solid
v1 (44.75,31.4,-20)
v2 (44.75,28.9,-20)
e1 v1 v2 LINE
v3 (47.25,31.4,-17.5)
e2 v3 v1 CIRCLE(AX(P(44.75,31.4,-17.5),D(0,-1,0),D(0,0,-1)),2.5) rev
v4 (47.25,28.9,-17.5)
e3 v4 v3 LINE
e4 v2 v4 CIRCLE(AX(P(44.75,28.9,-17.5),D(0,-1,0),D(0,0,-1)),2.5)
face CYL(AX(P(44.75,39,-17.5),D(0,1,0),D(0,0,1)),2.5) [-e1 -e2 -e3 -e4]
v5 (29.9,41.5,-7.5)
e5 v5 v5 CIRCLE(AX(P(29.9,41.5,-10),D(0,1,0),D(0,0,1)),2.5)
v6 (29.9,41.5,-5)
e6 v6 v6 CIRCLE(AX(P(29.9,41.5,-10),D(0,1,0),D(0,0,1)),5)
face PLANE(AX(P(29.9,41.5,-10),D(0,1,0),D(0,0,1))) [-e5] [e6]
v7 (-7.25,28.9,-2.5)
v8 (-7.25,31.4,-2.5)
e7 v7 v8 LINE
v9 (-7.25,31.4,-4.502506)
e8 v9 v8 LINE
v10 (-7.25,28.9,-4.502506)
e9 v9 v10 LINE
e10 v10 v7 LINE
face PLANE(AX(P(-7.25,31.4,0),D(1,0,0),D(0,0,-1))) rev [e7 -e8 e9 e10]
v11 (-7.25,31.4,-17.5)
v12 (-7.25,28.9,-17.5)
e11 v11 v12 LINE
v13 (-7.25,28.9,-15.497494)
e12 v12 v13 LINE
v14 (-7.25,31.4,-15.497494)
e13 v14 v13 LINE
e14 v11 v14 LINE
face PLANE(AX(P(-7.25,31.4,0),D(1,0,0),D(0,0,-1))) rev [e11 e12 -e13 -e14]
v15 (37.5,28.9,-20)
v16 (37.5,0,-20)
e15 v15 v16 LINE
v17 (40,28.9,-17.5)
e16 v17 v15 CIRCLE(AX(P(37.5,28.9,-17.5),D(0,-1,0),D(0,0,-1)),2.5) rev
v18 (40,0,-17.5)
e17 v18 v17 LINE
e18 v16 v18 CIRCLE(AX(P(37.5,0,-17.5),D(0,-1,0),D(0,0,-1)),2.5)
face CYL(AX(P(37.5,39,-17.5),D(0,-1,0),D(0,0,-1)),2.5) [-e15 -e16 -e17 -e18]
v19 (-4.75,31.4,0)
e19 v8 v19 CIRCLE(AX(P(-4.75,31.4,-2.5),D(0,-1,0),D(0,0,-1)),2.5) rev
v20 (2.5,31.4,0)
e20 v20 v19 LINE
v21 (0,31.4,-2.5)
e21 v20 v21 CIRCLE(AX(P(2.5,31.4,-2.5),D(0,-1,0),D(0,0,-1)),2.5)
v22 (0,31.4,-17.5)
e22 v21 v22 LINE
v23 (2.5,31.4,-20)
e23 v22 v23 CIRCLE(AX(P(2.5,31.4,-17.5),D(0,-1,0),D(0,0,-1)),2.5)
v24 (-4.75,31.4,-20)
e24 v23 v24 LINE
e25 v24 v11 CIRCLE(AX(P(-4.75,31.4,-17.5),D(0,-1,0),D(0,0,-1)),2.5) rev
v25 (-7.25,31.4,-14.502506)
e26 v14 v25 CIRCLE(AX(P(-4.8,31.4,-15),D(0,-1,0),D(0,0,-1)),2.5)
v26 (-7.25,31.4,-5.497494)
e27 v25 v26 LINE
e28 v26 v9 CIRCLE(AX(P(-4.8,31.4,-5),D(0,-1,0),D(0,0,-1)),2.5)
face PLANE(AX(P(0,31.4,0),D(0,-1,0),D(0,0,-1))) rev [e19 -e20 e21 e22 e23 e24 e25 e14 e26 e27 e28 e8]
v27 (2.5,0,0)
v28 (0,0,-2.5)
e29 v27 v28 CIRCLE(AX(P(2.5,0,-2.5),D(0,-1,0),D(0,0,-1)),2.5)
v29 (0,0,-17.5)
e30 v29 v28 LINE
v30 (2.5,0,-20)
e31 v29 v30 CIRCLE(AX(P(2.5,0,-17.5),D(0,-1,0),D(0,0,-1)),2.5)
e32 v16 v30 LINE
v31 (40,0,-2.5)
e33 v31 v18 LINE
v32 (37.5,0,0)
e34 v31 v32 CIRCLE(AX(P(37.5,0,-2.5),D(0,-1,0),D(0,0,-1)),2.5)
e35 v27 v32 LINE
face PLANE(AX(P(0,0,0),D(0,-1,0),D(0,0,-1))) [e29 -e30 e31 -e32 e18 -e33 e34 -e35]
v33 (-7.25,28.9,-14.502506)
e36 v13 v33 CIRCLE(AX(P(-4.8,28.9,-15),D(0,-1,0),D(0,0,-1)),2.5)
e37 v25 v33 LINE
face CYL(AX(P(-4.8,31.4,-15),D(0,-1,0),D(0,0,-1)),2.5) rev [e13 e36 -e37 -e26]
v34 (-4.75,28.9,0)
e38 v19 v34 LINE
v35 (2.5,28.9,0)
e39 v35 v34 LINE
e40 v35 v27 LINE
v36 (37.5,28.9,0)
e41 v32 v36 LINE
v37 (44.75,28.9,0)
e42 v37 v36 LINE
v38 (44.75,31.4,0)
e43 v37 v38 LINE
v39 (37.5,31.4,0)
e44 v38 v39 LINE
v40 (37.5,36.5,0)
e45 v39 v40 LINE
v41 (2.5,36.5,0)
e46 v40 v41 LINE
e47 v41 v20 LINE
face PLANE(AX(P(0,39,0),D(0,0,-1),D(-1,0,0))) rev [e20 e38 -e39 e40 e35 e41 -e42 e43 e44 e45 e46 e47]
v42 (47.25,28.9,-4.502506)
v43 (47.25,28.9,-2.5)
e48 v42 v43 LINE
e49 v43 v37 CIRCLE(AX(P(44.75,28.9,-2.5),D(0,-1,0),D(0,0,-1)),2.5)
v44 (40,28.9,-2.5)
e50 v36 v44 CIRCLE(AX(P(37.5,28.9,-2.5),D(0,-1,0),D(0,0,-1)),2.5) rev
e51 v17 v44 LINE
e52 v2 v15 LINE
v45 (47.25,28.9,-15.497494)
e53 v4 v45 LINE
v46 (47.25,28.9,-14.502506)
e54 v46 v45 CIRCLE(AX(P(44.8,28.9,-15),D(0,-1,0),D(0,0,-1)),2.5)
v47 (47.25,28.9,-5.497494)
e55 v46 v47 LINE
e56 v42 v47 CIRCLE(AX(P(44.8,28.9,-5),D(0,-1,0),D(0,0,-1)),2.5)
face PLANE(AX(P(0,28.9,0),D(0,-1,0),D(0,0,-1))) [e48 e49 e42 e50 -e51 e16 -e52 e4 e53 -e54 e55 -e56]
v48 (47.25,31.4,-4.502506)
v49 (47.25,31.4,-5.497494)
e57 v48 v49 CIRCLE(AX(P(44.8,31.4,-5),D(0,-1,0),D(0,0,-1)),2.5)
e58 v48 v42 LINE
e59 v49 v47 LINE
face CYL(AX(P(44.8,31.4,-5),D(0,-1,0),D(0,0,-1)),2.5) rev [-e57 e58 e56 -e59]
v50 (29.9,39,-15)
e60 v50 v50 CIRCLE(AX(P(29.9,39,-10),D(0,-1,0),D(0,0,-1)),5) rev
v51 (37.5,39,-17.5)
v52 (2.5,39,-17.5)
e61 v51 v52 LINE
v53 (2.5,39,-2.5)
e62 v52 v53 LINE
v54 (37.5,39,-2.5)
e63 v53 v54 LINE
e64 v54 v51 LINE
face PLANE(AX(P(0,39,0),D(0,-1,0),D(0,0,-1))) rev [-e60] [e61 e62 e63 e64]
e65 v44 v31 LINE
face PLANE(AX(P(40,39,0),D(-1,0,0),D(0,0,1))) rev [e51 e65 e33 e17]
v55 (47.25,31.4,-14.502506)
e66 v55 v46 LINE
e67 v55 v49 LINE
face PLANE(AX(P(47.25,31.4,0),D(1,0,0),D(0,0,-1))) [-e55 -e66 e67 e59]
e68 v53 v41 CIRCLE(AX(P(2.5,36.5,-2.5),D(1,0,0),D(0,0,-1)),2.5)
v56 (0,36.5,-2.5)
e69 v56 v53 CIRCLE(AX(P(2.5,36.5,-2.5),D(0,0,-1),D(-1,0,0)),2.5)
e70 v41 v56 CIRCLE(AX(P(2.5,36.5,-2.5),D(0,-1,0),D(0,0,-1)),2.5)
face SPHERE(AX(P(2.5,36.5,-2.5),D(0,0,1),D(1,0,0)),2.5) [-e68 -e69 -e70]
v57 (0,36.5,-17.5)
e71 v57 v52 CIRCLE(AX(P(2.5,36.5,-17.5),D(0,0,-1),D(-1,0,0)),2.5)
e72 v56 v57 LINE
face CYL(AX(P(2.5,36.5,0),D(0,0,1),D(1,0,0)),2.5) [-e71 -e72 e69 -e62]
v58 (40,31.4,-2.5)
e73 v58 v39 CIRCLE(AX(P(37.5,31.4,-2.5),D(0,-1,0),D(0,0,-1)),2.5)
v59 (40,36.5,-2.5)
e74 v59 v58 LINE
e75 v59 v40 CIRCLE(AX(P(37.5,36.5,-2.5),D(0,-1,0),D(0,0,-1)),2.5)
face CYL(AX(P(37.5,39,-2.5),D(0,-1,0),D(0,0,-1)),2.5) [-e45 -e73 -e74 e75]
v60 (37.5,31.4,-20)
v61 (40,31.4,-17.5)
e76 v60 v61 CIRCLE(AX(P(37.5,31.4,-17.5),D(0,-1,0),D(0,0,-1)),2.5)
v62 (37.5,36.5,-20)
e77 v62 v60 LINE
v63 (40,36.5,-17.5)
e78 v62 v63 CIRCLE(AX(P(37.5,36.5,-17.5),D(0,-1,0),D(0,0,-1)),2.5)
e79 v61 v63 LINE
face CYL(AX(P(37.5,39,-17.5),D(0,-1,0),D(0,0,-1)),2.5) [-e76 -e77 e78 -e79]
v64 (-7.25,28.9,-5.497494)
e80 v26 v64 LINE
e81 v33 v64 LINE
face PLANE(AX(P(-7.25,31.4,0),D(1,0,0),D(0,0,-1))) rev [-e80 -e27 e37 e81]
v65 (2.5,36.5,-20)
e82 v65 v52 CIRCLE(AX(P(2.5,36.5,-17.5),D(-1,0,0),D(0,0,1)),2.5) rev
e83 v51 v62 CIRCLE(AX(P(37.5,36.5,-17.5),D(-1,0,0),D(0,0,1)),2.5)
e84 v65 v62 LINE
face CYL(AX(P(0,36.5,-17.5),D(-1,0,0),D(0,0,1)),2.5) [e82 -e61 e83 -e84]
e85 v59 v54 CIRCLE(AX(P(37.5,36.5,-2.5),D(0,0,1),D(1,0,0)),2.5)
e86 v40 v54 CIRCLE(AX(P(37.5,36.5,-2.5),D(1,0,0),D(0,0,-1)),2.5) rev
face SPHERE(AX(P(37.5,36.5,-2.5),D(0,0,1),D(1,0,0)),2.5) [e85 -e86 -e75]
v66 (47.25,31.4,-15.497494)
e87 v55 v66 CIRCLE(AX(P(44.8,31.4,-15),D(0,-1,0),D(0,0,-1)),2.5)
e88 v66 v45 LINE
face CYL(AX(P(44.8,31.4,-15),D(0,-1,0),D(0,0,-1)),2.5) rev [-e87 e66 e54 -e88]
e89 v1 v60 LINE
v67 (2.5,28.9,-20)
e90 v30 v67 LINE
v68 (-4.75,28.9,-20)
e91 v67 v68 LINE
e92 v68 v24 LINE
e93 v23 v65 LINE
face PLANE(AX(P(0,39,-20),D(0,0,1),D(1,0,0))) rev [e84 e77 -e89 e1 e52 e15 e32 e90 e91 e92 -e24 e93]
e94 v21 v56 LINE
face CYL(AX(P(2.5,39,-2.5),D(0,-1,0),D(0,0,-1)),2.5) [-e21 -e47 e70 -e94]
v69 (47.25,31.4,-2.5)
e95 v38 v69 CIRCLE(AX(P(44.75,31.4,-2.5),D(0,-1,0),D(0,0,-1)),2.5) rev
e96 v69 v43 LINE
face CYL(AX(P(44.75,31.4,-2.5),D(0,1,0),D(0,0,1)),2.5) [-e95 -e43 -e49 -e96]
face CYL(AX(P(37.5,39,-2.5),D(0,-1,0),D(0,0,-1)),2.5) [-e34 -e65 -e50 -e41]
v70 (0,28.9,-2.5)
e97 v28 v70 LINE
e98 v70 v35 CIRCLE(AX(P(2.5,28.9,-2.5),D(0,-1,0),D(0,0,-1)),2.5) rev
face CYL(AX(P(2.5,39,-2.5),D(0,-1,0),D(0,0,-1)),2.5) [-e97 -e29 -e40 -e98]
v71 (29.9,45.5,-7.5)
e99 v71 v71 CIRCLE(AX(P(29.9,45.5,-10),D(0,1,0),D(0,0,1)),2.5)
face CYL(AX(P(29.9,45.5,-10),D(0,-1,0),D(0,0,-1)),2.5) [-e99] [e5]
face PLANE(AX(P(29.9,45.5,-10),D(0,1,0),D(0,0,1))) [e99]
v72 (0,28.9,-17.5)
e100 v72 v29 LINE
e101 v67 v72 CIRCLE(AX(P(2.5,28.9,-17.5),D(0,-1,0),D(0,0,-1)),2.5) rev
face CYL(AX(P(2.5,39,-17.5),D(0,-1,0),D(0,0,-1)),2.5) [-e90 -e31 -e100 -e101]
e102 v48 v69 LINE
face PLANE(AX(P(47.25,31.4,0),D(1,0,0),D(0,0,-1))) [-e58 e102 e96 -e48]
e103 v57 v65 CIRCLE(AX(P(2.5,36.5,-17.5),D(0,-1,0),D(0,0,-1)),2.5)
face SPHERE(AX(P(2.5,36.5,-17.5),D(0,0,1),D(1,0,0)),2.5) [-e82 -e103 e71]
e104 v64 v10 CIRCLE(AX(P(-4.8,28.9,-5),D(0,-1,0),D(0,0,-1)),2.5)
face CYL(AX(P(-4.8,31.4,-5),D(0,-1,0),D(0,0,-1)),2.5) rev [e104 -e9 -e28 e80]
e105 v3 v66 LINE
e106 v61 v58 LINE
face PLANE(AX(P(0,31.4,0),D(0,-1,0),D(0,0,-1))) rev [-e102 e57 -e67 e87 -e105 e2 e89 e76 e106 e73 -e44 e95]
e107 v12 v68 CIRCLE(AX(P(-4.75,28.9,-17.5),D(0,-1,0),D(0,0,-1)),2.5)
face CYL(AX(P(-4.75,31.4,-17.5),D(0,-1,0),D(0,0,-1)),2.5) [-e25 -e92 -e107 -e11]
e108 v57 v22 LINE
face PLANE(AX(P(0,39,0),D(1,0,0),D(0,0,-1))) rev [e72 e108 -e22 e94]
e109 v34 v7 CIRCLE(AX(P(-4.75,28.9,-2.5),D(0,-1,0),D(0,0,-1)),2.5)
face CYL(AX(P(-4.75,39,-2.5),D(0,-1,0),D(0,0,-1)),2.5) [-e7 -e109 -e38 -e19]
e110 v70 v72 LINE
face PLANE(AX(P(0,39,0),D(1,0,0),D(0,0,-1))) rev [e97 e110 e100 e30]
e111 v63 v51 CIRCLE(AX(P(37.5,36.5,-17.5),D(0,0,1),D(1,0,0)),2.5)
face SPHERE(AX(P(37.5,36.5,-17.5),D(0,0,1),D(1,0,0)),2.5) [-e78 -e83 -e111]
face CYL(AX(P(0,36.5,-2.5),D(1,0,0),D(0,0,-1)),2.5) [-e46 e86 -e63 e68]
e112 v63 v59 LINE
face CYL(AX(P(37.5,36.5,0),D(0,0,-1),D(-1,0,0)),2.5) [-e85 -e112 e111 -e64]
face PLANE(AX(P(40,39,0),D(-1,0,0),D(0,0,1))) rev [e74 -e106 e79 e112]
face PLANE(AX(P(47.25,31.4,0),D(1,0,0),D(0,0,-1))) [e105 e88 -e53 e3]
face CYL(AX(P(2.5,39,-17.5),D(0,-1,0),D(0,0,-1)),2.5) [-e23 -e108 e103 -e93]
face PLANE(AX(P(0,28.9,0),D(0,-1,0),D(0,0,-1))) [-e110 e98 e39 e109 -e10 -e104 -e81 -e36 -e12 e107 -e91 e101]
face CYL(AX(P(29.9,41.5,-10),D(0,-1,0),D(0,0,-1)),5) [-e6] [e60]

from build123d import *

# Parameters (mm, degrees)
SKETCH1_W           = 40
SKETCH1_H           = 20
BOSS_EXTRUDE1_DEPTH = 39
BOSS_EXTRUDE2_DEPTH = 2.5
FILLET1_R           = 2.5
SKETCH3_R           = 5
BOSS_EXTRUDE3_DEPTH = 2.5
SKETCH4_R           = 2.5
BOSS_EXTRUDE4_DEPTH = 4
FILLET2_R           = 2.5
FILLET3_R           = 2.5


with BuildPart() as part:
    # Sketch1 → Boss-Extrude1 (new body)
    with BuildSketch(Plane(origin=(0, 0, 0), x_dir=(1, 0, 0), z_dir=(0, 1, 0))):
        with Locations((20, 10)):
            Rectangle(SKETCH1_W, SKETCH1_H)
    extrude(amount=BOSS_EXTRUDE1_DEPTH)

    # Sketch2 → Boss-Extrude2 (add)
    with BuildSketch(Plane(origin=(0, 28.9, 0), x_dir=(-1, 0, 0), z_dir=(0, -1, 0))):
        with BuildLine():
            ThreePointArc((-44.8, 12.5), (-46.382129215, 13.064317395), (-47.25, 14.502506281))
            Line((-47.25, 14.502506281), (-47.25, 5.497493719))
            ThreePointArc((-47.25, 5.497493719), (-46.382129215, 6.935682605), (-44.8, 7.5))
            Line((-44.8, 7.5), (-44.8, 12.5))
        make_face()
        with BuildLine():
            Line((7.25, 20), (-47.25, 20))
            Line((-47.25, 20), (-47.25, 15.497493719))
            ThreePointArc((-47.25, 15.497493719), (-44.55, 17.487468593), (-42.3, 15))
            ThreePointArc((-42.3, 15), (-43.032233047, 13.232233047), (-44.8, 12.5))
            Line((-44.8, 12.5), (-44.8, 7.5))
            ThreePointArc((-44.8, 7.5), (-43.032233047, 6.767766953), (-42.3, 5))
            ThreePointArc((-42.3, 5), (-44.55, 2.512531407), (-47.25, 4.502506281))
            Line((-47.25, 4.502506281), (-47.25, 0))
            Line((-47.25, 0), (7.25, 0))
            Line((7.25, 0), (7.25, 4.502506281))
            ThreePointArc((7.25, 4.502506281), (2.3, 5), (7.25, 5.497493719))
            Line((7.25, 5.497493719), (7.25, 14.502506281))
            ThreePointArc((7.25, 14.502506281), (2.3, 15), (7.25, 15.497493719))
            Line((7.25, 15.497493719), (7.25, 20))
        make_face()
    extrude(amount=-BOSS_EXTRUDE2_DEPTH)

    # Fillet1
    fillet1_edges = [part.edges().sort_by_distance(p)[0] for p in [
        (47.25, 30.15, -20),
        (-7.25, 30.15, 0),
        (-7.25, 30.15, -20),
        (47.25, 30.15, 0),
    ]]
    fillet(fillet1_edges, radius=FILLET1_R)

    # Sketch3 → Boss-Extrude3 (add)
    with BuildSketch(Plane(origin=(0, 39, 0), x_dir=(1, 0, 0), z_dir=(0, 1, 0))):
        with Locations(Location((29.9, 10, 0), (0, 0, 90))):
            Circle(SKETCH3_R)
    extrude(amount=BOSS_EXTRUDE3_DEPTH)

    # Sketch4 → Boss-Extrude4 (add)
    with BuildSketch(Plane(origin=(0, 41.5, 0), x_dir=(1, 0, 0), z_dir=(0, 1, 0))):
        with Locations(Location((29.9, 10, 0), (0, 0, 270))):
            Circle(SKETCH4_R)
    extrude(amount=BOSS_EXTRUDE4_DEPTH)

    # Fillet2
    fillet2_edges = [part.edges().sort_by_distance(p)[0] for p in [
        (0, 14.45, -20),
        (40, 14.45, -20),
        (40, 14.45, 0),
        (20, 39, -20),
        (0, 14.45, 0),
        (0, 35.2, -20),
        (40, 35.2, -20),
        (40, 35.2, 0),
        (0, 35.2, 0),
        (20, 39, 0),
    ]]
    fillet(fillet2_edges, radius=FILLET2_R)

    # Fillet3
    # the kernel refuses this fillet: 2.5 mm, written as the material it takes off along each edge
    with BuildSketch(Plane(origin=(2.5, 36.5, -2.5), x_dir=(0, 1, 0), z_dir=(-1, 0, 0))) as fillet3_piece_1_section:
        Polygon((0, 0), (FILLET3_R, 0), (FILLET3_R, -FILLET3_R), (0, -FILLET3_R), align=None)
    fillet3_piece_1 = extrude(amount=FILLET3_R, mode=Mode.PRIVATE)
    fillet3_piece_1 = fillet3_piece_1 - Plane(origin=(2.5, 36.5, -2.5), x_dir=(0, -0.7071067811865475, -0.7071067811865475), z_dir=(-1, 0, 0)) * Sphere(FILLET3_R, mode=Mode.PRIVATE)
    add(fillet3_piece_1, mode=Mode.SUBTRACT)
    with BuildSketch(Plane(origin=(37.5, 36.5, -2.5), x_dir=(1, 0, 0), z_dir=(0, 1, 0))) as fillet3_piece_2_section:
        Polygon((0, 0), (FILLET3_R, 0), (FILLET3_R, -FILLET3_R), (0, -FILLET3_R), align=None)
    fillet3_piece_2 = extrude(amount=FILLET3_R, mode=Mode.PRIVATE)
    fillet3_piece_2 = fillet3_piece_2 - Plane(origin=(37.5, 36.5, -2.5), x_dir=(-0.7071067811865475, 0, -0.7071067811865475), z_dir=(0, 1, 0)) * Sphere(FILLET3_R, mode=Mode.PRIVATE)
    add(fillet3_piece_2, mode=Mode.SUBTRACT)
    with BuildSketch(Plane(origin=(37.5, 36.5, -17.5), x_dir=(1, 0, 0), z_dir=(0, 1, 0))) as fillet3_piece_3_section:
        Polygon((0, 0), (FILLET3_R, 0), (FILLET3_R, FILLET3_R), (0, FILLET3_R), align=None)
    fillet3_piece_3 = extrude(amount=FILLET3_R, mode=Mode.PRIVATE)
    fillet3_piece_3 = fillet3_piece_3 - Plane(origin=(37.5, 36.5, -17.5), x_dir=(-0.7071067811865475, 0, 0.7071067811865475), z_dir=(0, 1, 0)) * Sphere(FILLET3_R, mode=Mode.PRIVATE)
    add(fillet3_piece_3, mode=Mode.SUBTRACT)
    with BuildSketch(Plane(origin=(2.5, 36.5, -17.5), x_dir=(0, 1, 0), z_dir=(-1, 0, 0))) as fillet3_piece_4_section:
        Polygon((0, 0), (FILLET3_R, 0), (FILLET3_R, FILLET3_R), (0, FILLET3_R), align=None)
    fillet3_piece_4 = extrude(amount=FILLET3_R, mode=Mode.PRIVATE)
    fillet3_piece_4 = fillet3_piece_4 - Plane(origin=(2.5, 36.5, -17.5), x_dir=(0, -0.7071067811865475, 0.7071067811865475), z_dir=(-1, 0, 0)) * Sphere(FILLET3_R, mode=Mode.PRIVATE)
    add(fillet3_piece_4, mode=Mode.SUBTRACT)
    with BuildSketch(Plane(origin=(0, 39, -17.5), x_dir=(0, -1, 0), z_dir=(0, 0, 1))) as fillet3_piece_5:
        with BuildLine():
            CenterArc((FILLET3_R, FILLET3_R), FILLET3_R, 180, 90)
            Line((0, FILLET3_R), (0, 0))
            Line((0, 0), (FILLET3_R, 0))
        make_face()
    extrude(amount=15, mode=Mode.SUBTRACT)
    with BuildSketch(Plane(origin=(40, 39, -2.5), x_dir=(-1, 0, 0), z_dir=(0, 0, -1))) as fillet3_piece_6:
        with BuildLine():
            CenterArc((FILLET3_R, -FILLET3_R), FILLET3_R, 90, 90)
            Line((0, -FILLET3_R), (0, 0))
            Line((0, 0), (FILLET3_R, 0))
        make_face()
    extrude(amount=15, mode=Mode.SUBTRACT)


solid = part.part
